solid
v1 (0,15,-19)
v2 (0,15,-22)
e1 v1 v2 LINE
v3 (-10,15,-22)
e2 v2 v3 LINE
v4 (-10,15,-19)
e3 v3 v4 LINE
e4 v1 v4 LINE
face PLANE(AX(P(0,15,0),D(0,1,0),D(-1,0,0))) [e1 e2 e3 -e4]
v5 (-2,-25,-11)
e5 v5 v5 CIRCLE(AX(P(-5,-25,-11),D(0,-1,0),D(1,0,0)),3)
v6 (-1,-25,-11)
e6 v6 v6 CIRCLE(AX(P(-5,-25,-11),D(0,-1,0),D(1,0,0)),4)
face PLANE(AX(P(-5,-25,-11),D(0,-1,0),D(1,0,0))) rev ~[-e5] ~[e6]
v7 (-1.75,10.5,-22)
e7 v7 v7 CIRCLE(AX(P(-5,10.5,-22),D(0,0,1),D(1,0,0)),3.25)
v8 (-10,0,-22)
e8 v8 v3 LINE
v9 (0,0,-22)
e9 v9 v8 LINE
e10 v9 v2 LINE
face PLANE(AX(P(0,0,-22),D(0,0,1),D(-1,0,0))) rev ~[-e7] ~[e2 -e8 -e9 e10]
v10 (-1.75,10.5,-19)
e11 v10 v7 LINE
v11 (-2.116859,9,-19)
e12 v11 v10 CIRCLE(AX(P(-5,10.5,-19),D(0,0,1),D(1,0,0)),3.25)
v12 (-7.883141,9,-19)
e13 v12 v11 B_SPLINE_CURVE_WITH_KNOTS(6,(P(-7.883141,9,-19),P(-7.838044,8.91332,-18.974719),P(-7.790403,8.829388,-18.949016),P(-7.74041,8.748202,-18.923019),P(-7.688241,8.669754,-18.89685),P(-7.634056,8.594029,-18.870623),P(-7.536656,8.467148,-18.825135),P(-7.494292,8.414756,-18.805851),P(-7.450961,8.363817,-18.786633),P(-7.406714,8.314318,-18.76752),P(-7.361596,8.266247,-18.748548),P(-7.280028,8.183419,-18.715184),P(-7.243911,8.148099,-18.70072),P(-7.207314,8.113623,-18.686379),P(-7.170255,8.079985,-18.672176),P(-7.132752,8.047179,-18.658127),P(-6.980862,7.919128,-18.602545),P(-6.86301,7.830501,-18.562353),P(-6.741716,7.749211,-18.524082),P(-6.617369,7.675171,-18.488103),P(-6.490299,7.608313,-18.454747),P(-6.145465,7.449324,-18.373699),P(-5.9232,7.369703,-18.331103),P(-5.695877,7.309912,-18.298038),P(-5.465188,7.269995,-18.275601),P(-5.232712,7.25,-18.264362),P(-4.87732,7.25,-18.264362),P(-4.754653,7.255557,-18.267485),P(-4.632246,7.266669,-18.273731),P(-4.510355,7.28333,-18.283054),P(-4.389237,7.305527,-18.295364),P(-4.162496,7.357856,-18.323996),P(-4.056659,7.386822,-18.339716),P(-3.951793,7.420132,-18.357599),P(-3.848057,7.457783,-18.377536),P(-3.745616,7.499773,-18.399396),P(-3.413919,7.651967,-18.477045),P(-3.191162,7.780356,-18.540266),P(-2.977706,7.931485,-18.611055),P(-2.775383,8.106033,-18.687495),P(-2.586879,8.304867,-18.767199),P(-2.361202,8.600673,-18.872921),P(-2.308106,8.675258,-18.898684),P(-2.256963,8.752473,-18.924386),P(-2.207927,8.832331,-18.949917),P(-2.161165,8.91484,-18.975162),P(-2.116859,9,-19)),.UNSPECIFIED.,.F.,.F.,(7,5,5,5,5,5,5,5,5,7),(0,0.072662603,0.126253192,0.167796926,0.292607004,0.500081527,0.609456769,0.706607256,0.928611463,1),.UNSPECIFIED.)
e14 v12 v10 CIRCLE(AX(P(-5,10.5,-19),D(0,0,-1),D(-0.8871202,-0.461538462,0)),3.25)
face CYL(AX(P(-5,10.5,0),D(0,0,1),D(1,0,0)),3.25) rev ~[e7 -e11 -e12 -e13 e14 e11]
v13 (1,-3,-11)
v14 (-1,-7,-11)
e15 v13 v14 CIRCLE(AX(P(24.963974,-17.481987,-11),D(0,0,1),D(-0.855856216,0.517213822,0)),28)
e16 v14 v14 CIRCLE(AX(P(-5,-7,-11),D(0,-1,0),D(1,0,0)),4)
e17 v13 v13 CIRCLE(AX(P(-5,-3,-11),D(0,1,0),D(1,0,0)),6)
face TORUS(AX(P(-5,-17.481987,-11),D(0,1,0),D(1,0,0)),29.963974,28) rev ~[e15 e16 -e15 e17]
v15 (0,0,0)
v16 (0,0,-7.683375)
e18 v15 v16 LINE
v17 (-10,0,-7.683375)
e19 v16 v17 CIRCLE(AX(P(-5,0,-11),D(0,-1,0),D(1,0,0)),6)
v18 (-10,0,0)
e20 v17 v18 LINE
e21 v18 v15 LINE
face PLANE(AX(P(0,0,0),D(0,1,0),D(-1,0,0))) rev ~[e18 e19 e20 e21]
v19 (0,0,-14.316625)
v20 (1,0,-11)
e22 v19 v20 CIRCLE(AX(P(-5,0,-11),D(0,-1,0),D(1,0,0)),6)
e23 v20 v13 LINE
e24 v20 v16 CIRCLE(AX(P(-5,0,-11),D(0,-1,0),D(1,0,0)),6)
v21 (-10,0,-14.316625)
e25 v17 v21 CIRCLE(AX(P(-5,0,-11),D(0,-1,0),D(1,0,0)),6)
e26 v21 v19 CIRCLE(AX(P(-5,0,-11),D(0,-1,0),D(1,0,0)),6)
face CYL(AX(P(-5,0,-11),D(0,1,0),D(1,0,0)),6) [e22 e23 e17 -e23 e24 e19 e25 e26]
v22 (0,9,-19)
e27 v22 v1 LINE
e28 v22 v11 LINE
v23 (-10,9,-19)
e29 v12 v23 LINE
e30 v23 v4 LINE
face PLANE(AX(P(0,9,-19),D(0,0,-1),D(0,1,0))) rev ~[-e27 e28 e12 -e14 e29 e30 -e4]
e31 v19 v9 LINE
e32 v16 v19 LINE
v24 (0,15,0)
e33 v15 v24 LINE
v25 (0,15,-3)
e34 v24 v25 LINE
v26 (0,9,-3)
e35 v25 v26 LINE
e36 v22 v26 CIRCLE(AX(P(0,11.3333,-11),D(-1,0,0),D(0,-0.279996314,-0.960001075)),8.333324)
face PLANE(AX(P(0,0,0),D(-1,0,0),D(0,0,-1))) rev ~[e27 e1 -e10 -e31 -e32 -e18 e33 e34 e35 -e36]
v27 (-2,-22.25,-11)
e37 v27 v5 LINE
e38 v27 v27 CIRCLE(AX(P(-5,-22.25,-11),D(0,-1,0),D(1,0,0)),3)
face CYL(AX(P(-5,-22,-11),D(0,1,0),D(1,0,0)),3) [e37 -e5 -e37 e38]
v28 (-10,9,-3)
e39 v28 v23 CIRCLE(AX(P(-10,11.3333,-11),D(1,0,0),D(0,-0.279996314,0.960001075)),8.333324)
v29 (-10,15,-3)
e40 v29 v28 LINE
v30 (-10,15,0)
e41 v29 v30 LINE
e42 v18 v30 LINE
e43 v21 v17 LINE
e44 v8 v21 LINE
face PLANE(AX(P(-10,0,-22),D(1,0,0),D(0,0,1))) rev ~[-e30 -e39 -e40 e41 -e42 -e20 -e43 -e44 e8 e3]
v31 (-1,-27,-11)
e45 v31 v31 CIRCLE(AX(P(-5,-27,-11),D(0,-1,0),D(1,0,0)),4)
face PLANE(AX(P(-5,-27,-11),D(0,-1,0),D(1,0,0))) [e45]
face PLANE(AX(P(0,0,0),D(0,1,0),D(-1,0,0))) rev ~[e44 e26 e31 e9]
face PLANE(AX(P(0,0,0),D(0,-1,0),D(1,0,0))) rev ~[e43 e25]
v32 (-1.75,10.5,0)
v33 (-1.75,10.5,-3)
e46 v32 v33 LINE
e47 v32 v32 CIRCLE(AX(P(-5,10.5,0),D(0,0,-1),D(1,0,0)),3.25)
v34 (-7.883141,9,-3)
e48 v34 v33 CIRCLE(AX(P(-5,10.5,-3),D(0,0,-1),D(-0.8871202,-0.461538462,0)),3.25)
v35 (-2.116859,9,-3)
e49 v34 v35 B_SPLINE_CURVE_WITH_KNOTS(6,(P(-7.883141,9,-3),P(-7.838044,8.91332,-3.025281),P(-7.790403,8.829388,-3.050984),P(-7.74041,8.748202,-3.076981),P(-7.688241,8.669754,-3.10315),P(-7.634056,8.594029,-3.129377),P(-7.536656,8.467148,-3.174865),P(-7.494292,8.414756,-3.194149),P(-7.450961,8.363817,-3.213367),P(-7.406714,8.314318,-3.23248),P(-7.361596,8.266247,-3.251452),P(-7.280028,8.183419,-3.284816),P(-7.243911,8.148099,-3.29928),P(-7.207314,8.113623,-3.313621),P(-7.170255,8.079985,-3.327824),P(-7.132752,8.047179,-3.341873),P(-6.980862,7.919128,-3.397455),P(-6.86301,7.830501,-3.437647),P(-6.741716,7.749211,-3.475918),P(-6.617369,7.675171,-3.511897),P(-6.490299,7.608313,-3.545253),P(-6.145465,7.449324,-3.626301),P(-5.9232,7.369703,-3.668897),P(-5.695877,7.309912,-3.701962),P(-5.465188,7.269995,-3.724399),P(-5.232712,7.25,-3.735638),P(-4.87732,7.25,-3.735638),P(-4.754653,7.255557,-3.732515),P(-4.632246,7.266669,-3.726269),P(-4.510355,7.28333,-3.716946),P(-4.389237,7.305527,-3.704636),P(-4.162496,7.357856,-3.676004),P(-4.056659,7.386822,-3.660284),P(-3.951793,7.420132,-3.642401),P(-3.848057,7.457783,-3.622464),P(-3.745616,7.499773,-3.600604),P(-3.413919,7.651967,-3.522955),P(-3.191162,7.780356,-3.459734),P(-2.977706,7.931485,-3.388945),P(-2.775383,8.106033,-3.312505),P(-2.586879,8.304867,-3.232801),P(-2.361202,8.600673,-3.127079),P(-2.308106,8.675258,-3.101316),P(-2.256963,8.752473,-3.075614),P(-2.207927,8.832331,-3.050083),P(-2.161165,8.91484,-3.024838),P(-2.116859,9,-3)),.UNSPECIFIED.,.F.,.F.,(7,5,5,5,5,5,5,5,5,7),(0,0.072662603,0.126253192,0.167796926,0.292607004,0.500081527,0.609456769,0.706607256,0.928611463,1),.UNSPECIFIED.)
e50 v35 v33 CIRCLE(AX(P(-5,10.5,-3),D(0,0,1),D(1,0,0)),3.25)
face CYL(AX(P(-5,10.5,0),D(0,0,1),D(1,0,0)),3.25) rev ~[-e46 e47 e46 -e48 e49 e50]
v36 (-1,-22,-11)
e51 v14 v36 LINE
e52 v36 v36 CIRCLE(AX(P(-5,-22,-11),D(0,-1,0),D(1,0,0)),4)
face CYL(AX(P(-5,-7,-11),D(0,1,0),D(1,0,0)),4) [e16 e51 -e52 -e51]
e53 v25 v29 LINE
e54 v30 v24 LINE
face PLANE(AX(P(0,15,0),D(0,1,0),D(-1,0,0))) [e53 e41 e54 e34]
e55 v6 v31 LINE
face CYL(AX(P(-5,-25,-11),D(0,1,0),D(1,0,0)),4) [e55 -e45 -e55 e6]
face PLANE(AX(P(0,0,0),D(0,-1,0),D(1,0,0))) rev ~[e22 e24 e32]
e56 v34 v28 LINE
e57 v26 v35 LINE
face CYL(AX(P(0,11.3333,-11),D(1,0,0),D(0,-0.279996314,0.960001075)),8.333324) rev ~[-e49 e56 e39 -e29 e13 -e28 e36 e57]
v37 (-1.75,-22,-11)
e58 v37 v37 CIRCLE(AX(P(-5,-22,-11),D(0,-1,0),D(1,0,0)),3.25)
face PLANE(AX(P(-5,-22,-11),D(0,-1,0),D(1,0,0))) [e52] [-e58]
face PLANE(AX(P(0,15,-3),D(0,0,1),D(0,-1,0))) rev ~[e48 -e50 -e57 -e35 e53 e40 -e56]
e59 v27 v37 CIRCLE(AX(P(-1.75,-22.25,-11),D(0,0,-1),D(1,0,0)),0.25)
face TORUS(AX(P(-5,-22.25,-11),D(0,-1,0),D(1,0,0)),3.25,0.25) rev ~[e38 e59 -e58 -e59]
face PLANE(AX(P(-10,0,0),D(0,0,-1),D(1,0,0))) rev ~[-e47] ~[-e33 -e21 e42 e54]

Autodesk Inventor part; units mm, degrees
ref_plane "YZ Plane" through (0, 0, 0) normal (1, 0, 0) x (0, 1, 0)
ref_plane "XZ Plane" through (0, 0, 0) normal (0, 1, 0) x (-1, 0, 0)
ref_plane "XY Plane" through (0, 0, 0) normal (0, 0, 1) x (1, 0, 0)
sketch "Sketch1" plane through (0, 0, 0) normal (0, 0, 1) x (1, 0, 0)
  point P0 (0, 0)
sketch "Sketch2" plane through (0, 0, 0) normal (0, 1, 0) x (-1, 0, 0)
  line L0 (0, 0) -> (0, -22)
  line L1 (0, -22) -> (10, -22)
  line L2 (10, -22) -> (10, 0)
  line L3 (10, 0) -> (0, 0)
  dimension "d0" = 22
  dimension "d1" = 10
extrude "Extrusion1" add sketch "Sketch2" along normal blind 15
sketch "Sketch5" plane through (0, 0, 0) normal (1, 0, 0) x (0, 0, -1)
  line L0 (0, 0) -> (22, 0) projected
  line L1 (22, 0) -> (22, 15) projected
  line L2 (0, 15) -> (22, 15) projected
  line L3 (0, 0) -> (0, 15) projected
  line L4 (22, 15) -> (0, 15) projected
  line L5 (0, 15) -> (3, 15)
  line L6 (22, 15) -> (19, 15)
  line L7 (22, 0) -> (0, 0) projected
  line L8 (11, 0) -> (11, 3)
  line L9 (3, 15) -> (3, 9)
  line L10 (3, 9) -> (19, 9)
  line L11 (19, 9) -> (19, 15)
  arc A0 (3, 9) -> (19, 9) centre (11, 11.3333) ccw
  dimension "d4" = 3
  dimension "d5" = 3
  dimension "d7" = 3
  dimension "d8" = 6
extrude "Extrusion2" cut sketch "Sketch5" against normal blind 17 contours A0 L10 | L2 L11 L10 L9
sketch "Sketch6" plane through (-10, 0, 0) normal (0, 0, 1) x (1, 0, 0)
  line L0 (0, 0) -> (10, 0) projected
  line L1 (10, 0) -> (10, 15) projected
  line L2 (0, 15) -> (10, 15) projected
  line L3 (0, 0) -> (0, 15) projected
  line L4 (0, 15) -> (10, 15) projected
  line L5 (5, 15) -> (5, 10.5)
  circle A0 centre (5, 10.5) radius 3.25
  dimension "d11" = 4.5
  dimension "d30" = 6.5
extrude "Extrusion3" cut sketch "Sketch6" against normal blind 31.25 contours A0
sketch "Sketch7" plane through (0, 0, 0) normal (0, -1, 0) x (1, 0, 0)
  line L0 (0, -22) -> (-10, -22) projected
  line L1 (0, 0) -> (0, -22) projected
  line L2 (-10, 0) -> (0, 0) projected
  line L3 (-10, -22) -> (-10, 0) projected
  line L4 (0, -3) -> (0, -19) projected
  circle A0 centre (-5, -11) radius 6
  dimension "d15" = 12
extrude "Extrusion4" add sketch "Sketch7" along normal blind 3 contours A0 L3 | L3 A0 L1 | L1 A0
sketch "Sketch8" plane through (-5, -3, -11) normal (0, -1, 0) x (1, 0, 0)
  circle A0 centre (0, 0) radius 6 projected
  circle A1 centre (0, 0) radius 4
  point P0 (5, 11)
  dimension "d18" = 8
extrude "Extrusion5" add sketch "Sketch8" along normal blind 4 contours A1
fillet "Fillet1" radius 28 1 edges at (-9, -3, -11)
sketch "Sketch11" plane through (-5, -7, -11) normal (0, -1, 0) x (1, 0, 0)
  circle A0 centre (0, 0) radius 4
  point P0 (5, 11)
extrude "Extrusion6" add sketch "Sketch11" along normal blind 15
sketch "Sketch12" plane through (-5, -22, -11) normal (0, -1, 0) x (1, 0, 0)
  circle A0 centre (0, 0) radius 3
  point P0 (5, 11)
  dimension "d24" = 6
extrude "Extrusion7" add sketch "Sketch12" along normal blind 3
sketch "Sketch13" plane through (-5, -25, -11) normal (0, -1, 0) x (1, 0, 0)
  circle A0 centre (0, 0) radius 4
  point P0 (5, 11)
extrude "Extrusion8" add sketch "Sketch13" along normal blind 2
fillet "Fillet2" radius 0.25 1 edges at (-8, -22, -11)
